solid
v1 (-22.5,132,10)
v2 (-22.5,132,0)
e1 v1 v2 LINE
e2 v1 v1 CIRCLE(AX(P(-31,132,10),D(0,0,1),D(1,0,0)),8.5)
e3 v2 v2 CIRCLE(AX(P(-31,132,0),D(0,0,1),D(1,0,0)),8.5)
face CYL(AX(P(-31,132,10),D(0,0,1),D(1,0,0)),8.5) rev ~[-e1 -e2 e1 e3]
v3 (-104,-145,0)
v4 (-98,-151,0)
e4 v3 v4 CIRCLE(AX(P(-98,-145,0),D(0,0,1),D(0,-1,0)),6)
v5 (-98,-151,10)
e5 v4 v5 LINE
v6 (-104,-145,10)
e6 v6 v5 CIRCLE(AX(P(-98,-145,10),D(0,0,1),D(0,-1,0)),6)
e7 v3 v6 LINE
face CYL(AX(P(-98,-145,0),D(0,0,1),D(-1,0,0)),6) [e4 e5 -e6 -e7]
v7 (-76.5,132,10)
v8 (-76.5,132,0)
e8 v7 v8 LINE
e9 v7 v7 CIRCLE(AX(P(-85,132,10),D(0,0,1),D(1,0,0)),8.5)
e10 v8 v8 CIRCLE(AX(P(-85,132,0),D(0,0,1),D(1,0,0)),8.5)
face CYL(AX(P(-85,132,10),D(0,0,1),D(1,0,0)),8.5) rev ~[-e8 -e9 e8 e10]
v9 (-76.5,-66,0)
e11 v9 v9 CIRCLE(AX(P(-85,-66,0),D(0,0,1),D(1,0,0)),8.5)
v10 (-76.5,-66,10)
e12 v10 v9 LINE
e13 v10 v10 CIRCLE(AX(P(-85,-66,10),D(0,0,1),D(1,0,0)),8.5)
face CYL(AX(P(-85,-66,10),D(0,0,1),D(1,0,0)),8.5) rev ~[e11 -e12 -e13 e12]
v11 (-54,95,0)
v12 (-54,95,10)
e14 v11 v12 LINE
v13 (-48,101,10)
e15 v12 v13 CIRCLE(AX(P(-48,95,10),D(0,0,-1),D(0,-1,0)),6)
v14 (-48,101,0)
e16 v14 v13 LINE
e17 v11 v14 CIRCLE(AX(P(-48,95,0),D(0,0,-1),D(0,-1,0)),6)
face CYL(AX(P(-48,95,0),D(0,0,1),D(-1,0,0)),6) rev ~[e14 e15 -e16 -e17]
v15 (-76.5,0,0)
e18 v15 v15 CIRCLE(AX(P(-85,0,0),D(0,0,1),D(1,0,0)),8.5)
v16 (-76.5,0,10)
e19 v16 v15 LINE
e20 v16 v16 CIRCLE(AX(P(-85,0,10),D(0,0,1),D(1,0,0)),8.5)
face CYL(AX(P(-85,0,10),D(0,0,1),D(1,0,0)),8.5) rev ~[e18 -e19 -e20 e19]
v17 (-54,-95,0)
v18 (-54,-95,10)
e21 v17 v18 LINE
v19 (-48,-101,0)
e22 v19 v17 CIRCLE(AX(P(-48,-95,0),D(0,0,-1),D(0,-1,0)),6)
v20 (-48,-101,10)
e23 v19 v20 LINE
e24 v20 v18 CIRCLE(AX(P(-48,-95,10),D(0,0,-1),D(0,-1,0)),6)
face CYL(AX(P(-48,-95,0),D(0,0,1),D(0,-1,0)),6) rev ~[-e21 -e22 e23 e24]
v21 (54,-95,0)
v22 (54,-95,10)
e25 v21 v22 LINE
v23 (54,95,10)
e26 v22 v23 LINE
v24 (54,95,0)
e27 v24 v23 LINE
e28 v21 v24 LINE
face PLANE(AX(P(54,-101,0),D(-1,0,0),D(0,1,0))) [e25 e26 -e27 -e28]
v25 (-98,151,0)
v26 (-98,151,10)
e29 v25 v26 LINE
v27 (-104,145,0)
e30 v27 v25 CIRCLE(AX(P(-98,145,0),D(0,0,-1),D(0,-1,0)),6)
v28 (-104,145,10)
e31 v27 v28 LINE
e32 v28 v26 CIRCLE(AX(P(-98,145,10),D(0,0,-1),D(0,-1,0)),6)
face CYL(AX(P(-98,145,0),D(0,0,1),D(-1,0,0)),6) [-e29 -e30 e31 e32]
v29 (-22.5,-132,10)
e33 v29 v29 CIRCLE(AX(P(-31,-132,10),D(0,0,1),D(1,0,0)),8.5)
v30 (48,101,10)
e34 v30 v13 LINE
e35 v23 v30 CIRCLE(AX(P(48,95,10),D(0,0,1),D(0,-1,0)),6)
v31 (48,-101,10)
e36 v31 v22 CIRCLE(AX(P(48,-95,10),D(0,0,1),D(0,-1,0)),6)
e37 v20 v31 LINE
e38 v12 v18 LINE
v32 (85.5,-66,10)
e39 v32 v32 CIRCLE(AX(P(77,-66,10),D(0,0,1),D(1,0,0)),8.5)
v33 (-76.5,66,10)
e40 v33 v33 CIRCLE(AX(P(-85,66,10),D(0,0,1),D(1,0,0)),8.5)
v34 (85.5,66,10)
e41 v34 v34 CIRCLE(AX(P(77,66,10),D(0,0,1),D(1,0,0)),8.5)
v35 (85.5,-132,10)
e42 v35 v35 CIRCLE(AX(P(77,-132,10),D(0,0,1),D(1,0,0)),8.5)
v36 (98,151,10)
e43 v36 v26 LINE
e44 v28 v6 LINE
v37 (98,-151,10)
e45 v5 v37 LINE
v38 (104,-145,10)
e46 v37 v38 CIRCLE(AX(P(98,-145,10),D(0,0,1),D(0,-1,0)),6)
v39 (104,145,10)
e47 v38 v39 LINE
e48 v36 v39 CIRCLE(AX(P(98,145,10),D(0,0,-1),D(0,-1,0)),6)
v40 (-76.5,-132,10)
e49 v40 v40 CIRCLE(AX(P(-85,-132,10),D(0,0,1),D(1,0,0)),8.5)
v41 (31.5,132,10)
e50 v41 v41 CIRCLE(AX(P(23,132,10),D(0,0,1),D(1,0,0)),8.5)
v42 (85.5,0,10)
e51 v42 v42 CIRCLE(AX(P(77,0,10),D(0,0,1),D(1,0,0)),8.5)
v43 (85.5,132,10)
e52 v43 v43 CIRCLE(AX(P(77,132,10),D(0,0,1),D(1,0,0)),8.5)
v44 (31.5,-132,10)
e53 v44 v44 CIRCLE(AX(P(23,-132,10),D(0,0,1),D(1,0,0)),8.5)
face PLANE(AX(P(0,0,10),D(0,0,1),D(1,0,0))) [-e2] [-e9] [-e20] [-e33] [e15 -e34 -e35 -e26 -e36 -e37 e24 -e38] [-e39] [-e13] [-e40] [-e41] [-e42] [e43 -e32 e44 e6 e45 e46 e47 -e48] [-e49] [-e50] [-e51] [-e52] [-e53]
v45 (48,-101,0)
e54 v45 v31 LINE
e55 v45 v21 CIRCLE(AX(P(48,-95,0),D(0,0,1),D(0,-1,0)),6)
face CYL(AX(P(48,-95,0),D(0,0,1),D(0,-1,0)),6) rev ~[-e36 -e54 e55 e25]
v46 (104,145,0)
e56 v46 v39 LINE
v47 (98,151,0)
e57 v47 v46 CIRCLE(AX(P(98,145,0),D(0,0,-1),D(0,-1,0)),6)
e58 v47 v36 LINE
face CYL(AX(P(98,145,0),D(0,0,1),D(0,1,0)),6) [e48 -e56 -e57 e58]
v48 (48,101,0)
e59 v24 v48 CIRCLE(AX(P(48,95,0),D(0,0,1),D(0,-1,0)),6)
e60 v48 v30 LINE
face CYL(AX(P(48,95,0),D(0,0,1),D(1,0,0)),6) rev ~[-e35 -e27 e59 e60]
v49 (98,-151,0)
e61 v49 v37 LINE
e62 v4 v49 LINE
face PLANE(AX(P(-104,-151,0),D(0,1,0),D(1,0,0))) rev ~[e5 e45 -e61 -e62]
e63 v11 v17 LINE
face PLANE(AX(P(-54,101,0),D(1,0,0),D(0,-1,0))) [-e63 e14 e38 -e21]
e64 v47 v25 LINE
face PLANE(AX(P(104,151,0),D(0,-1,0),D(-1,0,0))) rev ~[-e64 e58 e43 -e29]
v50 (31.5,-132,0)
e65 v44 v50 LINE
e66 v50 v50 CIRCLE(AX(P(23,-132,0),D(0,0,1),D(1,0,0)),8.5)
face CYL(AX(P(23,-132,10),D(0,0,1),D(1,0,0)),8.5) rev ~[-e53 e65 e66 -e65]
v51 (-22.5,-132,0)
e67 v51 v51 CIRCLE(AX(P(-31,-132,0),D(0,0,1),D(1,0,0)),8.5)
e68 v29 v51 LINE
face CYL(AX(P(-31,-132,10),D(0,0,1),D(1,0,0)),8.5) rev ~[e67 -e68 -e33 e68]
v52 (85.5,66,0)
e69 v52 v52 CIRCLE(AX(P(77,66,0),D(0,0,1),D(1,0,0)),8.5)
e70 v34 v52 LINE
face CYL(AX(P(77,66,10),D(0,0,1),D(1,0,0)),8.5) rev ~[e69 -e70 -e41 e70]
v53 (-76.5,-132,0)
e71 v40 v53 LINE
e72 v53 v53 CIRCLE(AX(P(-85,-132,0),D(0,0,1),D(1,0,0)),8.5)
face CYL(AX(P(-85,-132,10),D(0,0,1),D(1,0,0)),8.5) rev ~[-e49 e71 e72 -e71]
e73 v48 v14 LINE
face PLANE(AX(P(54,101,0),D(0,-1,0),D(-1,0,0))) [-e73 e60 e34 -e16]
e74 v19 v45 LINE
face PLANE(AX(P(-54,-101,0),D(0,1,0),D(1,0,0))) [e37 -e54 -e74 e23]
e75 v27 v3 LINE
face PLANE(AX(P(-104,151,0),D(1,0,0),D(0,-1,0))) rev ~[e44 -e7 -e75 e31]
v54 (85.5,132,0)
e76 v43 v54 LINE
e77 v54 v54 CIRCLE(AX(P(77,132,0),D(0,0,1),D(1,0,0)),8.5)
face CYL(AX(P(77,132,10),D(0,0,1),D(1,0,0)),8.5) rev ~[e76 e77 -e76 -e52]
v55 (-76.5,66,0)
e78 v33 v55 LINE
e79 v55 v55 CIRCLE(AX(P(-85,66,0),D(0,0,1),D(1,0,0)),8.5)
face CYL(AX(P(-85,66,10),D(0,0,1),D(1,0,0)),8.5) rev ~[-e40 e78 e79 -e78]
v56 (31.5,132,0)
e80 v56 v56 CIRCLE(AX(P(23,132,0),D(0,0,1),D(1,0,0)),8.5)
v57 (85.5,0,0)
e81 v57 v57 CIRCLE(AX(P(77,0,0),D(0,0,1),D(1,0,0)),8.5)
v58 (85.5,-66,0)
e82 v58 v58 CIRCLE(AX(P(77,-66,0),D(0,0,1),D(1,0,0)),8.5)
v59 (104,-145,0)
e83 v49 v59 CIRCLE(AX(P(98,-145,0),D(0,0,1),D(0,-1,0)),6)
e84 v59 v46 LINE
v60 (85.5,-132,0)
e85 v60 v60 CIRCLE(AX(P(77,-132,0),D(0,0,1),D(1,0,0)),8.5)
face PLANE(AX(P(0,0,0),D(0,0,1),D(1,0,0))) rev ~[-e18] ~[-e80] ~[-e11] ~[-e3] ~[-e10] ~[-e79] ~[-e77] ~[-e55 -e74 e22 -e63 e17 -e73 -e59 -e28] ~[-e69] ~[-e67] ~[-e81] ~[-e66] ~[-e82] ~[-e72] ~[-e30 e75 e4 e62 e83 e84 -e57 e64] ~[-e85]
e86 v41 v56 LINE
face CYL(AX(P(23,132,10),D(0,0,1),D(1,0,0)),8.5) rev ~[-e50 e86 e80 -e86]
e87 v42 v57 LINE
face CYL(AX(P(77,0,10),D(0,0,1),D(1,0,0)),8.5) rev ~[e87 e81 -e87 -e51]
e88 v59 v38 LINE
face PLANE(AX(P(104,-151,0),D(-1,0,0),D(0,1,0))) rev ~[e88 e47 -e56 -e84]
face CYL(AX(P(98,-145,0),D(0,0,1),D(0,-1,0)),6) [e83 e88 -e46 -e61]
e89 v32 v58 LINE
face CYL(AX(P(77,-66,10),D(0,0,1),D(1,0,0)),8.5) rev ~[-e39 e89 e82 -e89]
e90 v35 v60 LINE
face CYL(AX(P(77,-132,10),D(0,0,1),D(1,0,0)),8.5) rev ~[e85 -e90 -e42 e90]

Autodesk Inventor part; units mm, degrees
ref_plane "YZ Plane" through (0, 0, 0) normal (1, 0, 0) x (0, 1, 0)
ref_plane "XZ Plane" through (0, 0, 0) normal (0, 1, 0) x (-1, 0, 0)
ref_plane "XY Plane" through (0, 0, 0) normal (0, 0, 1) x (1, 0, 0)
sketch "Sketch2" plane through (0, 0, 0) normal (0, 0, 1) x (1, 0, 0)
  line L0 (-54, -101) -> (54, -101)
  line L1 (54, -101) -> (54, 101)
  line L2 (54, 101) -> (-54, 101)
  line L3 (-54, 101) -> (-54, -101)
  line L4 (-54, -101) -> (54, 101) construction
  line L5 (54, -101) -> (-54, 101) construction
  line L6 (-104, -151) -> (104, -151)
  line L7 (104, -151) -> (104, 151)
  line L8 (104, 151) -> (-104, 151)
  line L9 (-104, 151) -> (-104, -151)
  point P0 (0, 0)
  dimension "d29" = 108
  dimension "d30" = 202
  dimension "d31" = 50
  dimension "d47" = 208
  dimension "d48" = 302
extrude "Plate2" add sketch "Sketch2" along normal blind 10
sketch "Sketch5" plane through (0, 0, 10) normal (0, 0, 1) x (1, 0, 0)
  line L0 (54, 101) -> (54, -101) construction
  line L1 (54, -101) -> (-54, -101) construction
  line L2 (-54, -101) -> (-54, 101) construction
  line L3 (-54, 101) -> (54, 101) construction
  line L4 (104, -151) -> (-104, -151) construction
  line L5 (104, 151) -> (104, -151) construction
  line L6 (-104, 151) -> (104, 151) construction
  line L7 (-104, -151) -> (-104, 151) construction
  line L8 (-85, 132) -> (85, 132) construction
  line L9 (85, 132) -> (85, -132) construction
  line L10 (85, -132) -> (-85, -132) construction
  line L11 (-85, -132) -> (-85, 132) construction
  circle A0 centre (-85, -132) radius 8.5
  circle A1 centre (-85, 132) radius 8.5
  circle A2 centre (-85, 0) radius 8.5
  circle A3 centre (-85, -66) radius 8.5
  circle A4 centre (-85, 66) radius 8.5
  line L12 (-54, 0) -> (54, 0) construction
  circle A5 centre (-31, -132) radius 8.5
  circle A6 centre (-31, -66) radius 8.5
  circle A7 centre (-31, 0) radius 8.5
  circle A8 centre (-31, 66) radius 8.5
  circle A9 centre (-31, 132) radius 8.5
  circle A10 centre (23, -132) radius 8.5
  circle A11 centre (23, -66) radius 8.5
  circle A12 centre (23, 0) radius 8.5
  circle A13 centre (23, 66) radius 8.5
  circle A14 centre (23, 132) radius 8.5
  circle A15 centre (77, -132) radius 8.5
  circle A16 centre (77, -66) radius 8.5
  circle A17 centre (77, 0) radius 8.5
  circle A18 centre (77, 66) radius 8.5
  circle A19 centre (77, 132) radius 8.5
  point P0 (0, 0)
  point P1 (0, -132)
  dimension "d33" = 17
  dimension "d34" = 19
  dimension "d35" = 66
  dimension "d36" = 66
  dimension "d39" = 54
extrude "Cut3" cut sketch "Sketch5" against normal blind 10
fillet "Corner Round1" radius 6 8 edges at (-104, -151, 5) (-104, 151, 5) (104, 151, 5) (104, -151, 5) (54, -101, 5) (-54, -101, 5) (-54, 101, 5) (54, 101, 5)
equation "\"d35\" = d36"
equation "\"d44\" = Thickness"
equation "\"d14\" = Thickness"
equation "\"BendReliefDepth\" = 0.5 * Thickness"
equation "\"TransitionRadius\" = BendRadius"
equation "\"JacobiRadiusSize\" = BendRadius"
equation "\"Thickness\" = 10"
equation "\"BendRadius\" = 6"
properties part number "PRS 1200-06 charging flange round" material "Steel"
